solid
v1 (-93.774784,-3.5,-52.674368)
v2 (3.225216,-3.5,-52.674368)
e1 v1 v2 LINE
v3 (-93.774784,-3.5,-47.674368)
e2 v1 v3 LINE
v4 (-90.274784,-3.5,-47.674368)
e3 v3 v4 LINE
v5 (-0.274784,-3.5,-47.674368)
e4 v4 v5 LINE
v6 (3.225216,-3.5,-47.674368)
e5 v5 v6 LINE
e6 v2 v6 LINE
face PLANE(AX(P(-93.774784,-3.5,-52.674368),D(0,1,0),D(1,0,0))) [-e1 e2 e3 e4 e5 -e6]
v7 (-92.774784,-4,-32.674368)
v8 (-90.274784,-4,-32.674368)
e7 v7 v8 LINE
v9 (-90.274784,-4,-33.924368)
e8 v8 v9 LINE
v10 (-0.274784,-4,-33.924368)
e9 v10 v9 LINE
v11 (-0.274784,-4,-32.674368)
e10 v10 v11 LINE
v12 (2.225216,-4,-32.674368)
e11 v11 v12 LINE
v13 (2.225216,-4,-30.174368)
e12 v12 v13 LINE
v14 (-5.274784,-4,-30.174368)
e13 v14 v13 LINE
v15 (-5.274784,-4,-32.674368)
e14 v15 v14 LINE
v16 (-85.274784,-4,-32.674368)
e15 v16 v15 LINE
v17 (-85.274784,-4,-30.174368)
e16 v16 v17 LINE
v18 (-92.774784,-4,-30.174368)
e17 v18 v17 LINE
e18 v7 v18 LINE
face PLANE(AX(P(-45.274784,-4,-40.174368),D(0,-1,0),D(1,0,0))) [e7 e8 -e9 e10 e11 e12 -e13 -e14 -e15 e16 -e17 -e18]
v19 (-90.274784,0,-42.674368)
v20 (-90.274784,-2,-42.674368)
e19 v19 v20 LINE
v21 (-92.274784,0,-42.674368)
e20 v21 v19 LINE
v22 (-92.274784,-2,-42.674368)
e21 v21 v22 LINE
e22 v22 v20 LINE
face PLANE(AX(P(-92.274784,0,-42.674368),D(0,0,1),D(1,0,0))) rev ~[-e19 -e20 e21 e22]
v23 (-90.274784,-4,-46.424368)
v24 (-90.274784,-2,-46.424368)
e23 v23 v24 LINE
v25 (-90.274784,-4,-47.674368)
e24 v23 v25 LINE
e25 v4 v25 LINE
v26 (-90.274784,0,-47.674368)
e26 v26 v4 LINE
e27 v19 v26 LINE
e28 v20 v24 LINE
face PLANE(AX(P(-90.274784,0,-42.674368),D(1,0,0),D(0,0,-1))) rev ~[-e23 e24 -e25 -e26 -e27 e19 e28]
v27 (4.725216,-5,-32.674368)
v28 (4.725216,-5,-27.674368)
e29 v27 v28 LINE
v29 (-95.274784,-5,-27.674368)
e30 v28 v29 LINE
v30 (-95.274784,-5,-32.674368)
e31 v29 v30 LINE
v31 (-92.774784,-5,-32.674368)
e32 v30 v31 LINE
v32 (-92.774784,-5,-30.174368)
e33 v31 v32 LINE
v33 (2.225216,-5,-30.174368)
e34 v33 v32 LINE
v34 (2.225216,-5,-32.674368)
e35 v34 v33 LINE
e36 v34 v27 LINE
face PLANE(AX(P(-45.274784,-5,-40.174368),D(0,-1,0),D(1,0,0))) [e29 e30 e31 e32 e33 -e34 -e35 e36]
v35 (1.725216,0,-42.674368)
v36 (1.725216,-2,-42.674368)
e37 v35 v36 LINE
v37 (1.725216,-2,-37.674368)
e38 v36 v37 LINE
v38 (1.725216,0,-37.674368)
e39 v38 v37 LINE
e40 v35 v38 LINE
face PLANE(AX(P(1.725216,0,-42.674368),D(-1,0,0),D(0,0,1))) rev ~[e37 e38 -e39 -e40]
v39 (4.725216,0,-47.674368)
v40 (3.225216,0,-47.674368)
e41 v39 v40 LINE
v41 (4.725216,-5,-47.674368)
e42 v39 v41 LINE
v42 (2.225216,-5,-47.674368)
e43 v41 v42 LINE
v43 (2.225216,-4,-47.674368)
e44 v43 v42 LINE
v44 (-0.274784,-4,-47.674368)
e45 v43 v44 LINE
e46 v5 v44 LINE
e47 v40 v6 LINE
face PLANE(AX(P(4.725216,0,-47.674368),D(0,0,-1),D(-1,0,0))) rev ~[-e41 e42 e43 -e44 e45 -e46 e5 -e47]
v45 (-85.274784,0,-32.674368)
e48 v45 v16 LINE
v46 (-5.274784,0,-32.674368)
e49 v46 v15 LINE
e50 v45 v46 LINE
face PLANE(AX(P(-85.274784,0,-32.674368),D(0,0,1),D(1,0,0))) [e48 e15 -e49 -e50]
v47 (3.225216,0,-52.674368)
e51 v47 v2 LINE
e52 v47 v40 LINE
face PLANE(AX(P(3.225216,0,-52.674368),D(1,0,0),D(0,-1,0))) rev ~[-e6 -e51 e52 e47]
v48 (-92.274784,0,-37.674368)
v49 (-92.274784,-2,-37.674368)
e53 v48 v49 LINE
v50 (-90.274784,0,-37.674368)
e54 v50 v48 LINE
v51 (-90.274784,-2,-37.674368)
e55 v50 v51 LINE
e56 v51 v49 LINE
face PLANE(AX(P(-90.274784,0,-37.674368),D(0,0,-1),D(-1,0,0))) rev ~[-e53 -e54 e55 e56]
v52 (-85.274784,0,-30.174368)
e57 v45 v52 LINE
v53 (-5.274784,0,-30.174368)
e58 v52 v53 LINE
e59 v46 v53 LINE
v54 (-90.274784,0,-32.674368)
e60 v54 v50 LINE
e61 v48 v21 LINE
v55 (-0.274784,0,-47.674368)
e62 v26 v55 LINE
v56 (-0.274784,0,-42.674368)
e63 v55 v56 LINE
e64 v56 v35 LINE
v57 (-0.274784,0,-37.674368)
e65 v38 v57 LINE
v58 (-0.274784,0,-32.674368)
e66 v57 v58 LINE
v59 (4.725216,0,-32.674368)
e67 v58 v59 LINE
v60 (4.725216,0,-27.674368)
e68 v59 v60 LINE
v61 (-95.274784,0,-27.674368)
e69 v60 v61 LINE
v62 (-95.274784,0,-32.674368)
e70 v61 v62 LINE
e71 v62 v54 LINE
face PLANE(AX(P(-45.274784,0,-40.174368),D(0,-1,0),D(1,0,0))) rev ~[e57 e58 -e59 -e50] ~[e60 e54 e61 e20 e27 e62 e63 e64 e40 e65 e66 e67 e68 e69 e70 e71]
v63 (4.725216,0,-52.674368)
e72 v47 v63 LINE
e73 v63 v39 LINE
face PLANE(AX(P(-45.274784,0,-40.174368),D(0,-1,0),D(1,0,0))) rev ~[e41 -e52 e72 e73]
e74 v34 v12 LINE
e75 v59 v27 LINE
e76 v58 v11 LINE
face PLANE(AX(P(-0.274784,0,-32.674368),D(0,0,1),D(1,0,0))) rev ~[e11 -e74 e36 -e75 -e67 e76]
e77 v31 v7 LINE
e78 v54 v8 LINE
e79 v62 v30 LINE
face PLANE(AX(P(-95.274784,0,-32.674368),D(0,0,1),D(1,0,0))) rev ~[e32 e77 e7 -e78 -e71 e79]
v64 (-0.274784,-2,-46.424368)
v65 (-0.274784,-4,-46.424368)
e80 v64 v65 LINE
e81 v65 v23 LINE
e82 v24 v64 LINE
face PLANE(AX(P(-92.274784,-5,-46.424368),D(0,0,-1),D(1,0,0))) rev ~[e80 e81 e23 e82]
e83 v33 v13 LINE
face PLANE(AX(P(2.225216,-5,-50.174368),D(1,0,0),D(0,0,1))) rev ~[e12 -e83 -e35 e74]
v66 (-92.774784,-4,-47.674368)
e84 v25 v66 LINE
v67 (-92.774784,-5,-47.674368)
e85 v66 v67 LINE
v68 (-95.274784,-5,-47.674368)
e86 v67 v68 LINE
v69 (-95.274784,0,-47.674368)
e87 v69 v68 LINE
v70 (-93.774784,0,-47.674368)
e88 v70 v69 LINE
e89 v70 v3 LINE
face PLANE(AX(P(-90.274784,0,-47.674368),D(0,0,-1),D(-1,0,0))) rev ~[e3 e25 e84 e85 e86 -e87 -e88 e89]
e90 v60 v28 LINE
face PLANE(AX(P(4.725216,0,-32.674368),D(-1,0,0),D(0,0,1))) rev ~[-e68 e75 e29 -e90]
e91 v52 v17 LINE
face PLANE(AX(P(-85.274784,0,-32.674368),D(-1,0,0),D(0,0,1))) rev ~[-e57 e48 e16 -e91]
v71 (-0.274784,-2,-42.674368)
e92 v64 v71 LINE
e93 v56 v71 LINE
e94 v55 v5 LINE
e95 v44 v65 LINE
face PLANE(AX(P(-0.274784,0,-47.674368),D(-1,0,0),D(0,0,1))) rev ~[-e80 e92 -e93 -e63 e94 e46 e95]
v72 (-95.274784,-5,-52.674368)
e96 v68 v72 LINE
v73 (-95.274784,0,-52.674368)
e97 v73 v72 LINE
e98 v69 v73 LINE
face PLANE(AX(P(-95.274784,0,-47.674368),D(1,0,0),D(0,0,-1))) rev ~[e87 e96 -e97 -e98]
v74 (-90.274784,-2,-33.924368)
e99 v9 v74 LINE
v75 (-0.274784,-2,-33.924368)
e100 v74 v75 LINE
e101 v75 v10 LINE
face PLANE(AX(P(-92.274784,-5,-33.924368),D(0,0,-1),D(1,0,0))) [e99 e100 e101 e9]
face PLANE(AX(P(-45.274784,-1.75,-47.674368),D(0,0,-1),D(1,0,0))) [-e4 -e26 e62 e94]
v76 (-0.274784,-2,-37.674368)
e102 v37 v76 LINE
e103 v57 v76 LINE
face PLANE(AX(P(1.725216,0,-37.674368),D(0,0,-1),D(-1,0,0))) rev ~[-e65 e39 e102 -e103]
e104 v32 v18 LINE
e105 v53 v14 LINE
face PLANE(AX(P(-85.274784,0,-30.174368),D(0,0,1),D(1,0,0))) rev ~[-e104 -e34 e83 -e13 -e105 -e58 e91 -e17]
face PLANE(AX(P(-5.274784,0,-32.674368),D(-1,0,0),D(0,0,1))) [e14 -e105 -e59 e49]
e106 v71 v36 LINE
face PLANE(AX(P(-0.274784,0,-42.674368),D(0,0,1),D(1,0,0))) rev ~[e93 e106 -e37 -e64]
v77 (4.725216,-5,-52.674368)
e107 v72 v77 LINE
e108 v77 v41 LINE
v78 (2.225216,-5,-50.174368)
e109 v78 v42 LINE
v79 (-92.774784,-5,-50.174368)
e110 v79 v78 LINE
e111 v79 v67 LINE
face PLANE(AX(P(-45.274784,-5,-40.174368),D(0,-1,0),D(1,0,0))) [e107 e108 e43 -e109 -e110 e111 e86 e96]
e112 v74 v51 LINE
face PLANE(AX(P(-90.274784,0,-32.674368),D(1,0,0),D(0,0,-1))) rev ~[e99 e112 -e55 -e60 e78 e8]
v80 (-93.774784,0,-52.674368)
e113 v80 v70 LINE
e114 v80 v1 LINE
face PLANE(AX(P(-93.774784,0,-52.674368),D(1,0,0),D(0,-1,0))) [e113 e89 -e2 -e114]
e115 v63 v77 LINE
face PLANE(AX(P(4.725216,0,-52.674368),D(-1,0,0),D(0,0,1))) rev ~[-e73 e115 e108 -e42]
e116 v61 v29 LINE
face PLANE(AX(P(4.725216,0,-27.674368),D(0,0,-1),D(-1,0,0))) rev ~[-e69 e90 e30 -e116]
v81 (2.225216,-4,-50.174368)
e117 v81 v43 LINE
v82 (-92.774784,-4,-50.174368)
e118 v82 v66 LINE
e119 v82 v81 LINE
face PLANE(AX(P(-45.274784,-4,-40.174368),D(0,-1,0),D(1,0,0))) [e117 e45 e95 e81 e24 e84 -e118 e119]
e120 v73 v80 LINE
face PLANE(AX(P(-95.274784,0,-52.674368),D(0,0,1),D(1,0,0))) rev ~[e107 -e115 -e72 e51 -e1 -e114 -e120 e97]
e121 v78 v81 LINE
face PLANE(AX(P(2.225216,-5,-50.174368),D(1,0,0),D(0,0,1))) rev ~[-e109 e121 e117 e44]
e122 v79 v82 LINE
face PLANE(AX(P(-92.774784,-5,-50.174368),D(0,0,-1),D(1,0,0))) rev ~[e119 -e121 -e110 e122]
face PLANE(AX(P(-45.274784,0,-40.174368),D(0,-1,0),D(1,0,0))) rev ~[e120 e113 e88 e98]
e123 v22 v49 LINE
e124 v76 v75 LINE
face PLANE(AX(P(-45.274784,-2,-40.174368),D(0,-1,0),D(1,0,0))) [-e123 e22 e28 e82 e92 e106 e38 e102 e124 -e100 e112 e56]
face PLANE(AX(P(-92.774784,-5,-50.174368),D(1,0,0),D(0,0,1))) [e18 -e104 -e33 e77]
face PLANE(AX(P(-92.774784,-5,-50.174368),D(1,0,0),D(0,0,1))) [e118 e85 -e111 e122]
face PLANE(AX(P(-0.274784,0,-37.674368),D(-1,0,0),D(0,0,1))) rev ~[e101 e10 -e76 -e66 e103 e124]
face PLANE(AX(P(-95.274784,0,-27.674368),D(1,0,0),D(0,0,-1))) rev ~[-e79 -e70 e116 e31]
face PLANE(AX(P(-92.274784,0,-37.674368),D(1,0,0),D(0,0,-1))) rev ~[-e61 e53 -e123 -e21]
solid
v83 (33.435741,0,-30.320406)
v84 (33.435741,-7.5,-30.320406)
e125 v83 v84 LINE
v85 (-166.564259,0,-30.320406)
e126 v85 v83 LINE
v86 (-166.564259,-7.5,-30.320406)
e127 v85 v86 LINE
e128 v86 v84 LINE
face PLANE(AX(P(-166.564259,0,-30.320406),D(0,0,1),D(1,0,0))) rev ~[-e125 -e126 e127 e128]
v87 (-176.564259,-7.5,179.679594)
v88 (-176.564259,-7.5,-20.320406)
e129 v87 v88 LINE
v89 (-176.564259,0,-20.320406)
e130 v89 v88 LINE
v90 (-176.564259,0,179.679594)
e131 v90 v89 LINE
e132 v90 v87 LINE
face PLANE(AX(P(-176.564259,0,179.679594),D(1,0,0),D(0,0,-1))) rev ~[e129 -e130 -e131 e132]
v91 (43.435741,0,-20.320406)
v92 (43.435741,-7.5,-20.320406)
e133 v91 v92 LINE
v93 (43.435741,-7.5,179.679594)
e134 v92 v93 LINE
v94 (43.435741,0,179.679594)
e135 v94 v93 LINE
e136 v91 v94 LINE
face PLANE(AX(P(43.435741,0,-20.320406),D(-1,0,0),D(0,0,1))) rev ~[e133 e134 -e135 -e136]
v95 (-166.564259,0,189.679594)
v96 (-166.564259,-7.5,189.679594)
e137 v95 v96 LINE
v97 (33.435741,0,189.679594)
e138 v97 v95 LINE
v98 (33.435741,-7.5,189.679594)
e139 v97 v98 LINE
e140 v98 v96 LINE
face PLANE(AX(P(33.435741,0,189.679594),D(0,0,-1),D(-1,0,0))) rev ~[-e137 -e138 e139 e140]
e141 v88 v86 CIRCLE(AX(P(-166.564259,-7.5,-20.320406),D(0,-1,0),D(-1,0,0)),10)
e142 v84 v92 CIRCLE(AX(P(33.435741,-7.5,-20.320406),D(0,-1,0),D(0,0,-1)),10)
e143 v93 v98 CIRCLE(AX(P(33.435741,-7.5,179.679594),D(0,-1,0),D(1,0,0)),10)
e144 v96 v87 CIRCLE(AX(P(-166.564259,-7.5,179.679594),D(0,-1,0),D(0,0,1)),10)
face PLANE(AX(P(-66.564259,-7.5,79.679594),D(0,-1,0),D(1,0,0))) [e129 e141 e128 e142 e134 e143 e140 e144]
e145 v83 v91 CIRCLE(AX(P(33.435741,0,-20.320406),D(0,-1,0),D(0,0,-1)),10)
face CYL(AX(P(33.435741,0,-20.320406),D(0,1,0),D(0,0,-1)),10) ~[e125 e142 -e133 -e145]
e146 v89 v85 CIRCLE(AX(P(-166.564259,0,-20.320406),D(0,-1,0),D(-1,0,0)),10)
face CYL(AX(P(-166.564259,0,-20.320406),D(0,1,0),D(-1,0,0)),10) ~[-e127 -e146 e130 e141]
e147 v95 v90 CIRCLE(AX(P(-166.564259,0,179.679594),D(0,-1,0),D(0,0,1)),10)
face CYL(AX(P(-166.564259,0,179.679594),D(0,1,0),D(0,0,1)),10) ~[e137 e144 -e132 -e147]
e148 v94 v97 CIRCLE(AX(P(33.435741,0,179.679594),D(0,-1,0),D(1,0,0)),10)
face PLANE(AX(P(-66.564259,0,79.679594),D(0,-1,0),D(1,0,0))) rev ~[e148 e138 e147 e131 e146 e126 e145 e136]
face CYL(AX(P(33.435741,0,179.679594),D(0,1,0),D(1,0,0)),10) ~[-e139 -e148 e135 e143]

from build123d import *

# Parameters (mm, degrees)
F0_R     = 5
F1_DEPTH = 7.5
F2_W     = 80
F2_H     = 2.5
F3_DEPTH = 5
F4_W     = 94
F4_H     = 12.5
F5_DEPTH = 3
F6_W     = 97
F6_H     = 3.5
F7_DEPTH = 5
F8_W     = 95
F8_H     = 20
F9_DEPTH = 1


with BuildPart() as f1:
    # F0 (on Front) → F1 (new body)
    with BuildSketch(Plane.XZ):
        with BuildLine():
            Line((33.4357412159, 189.6795940399), (-166.5642587841, 189.6795940399))
            ThreePointArc((-166.5642587841, 189.6795940399), (-173.6353265959, 186.7506618518), (-176.5642587841, 179.6795940399))
            Line((-176.5642587841, 179.6795940399), (-176.5642587841, -20.3204059601))
            ThreePointArc((-176.5642587841, -20.3204059601), (-173.6353265959, -27.3914737719), (-166.5642587841, -30.3204059601))
            Line((-166.5642587841, -30.3204059601), (33.4357412159, -30.3204059601))
            ThreePointArc((33.4357412159, -30.3204059601), (40.5068090278, -27.3914737719), (43.4357412159, -20.3204059601))
            Line((43.4357412159, -20.3204059601), (43.4357412159, 179.6795940399))
            ThreePointArc((43.4357412159, 179.6795940399), (40.5068090278, 186.7506618518), (33.4357412159, 189.6795940399))
        make_face()
        with Locations((-116.5642587841, 29.6795940399)):
            Circle(F0_R, mode=Mode.SUBTRACT)
        with Locations((-16.5642587841, 29.6795940399)):
            Circle(F0_R, mode=Mode.SUBTRACT)
        with Locations((-116.5642587841, 129.6795940399)):
            Circle(F0_R, mode=Mode.SUBTRACT)
        with Locations((-16.5642587841, 129.6795940399)):
            Circle(F0_R, mode=Mode.SUBTRACT)
        with Locations((-116.5642587841, 129.6795940399)):
            Circle(F0_R)
        with Locations((-16.5642587841, 129.6795940399)):
            Circle(F0_R)
        with Locations((-16.5642587841, 29.6795940399)):
            Circle(F0_R)
        with Locations((-116.5642587841, 29.6795940399)):
            Circle(F0_R)
    extrude(amount=F1_DEPTH)


with BuildPart() as f3:
    # F2 (on Front) → F3 (new body)
    with BuildSketch(Plane.XZ):
        Polygon((-95.2747841366, -52.6743675989), (-90.2747841366, -52.6743675989), (4.7252158634, -52.6743675989), (4.7252158634, -47.6743675989), (-0.2747841366, -47.6743675989), (-0.2747841366, -42.6743675989), (1.7252158634, -42.6743675989), (1.7252158634, -37.6743675989), (-0.2747841366, -37.6743675989), (-0.2747841366, -32.6743675989), (4.7252158634, -32.6743675989), (4.7252158634, -27.6743675989), (-90.2747841366, -27.6743675989), (-95.2747841366, -27.6743675989), (-95.2747841366, -32.6743675989), (-90.2747841366, -32.6743675989), (-90.2747841366, -37.6743675989), (-92.2747841366, -37.6743675989), (-92.2747841366, -42.6743675989), (-90.2747841366, -42.6743675989), (-90.2747841366, -47.6743675989), (-95.2747841366, -47.6743675989), align=None)
        with Locations((-45.2747841366, -31.4243675989)):
            Rectangle(F2_W, F2_H, mode=Mode.SUBTRACT)
    extrude(amount=F3_DEPTH)

    # F4 (on face) → F5 (cut)
    with BuildSketch(Plane.XZ.offset(5)):
        with Locations((-45.2747841366, -40.1743675989)):
            Rectangle(F4_W, F4_H)
    extrude(amount=-F5_DEPTH, mode=Mode.SUBTRACT)

    # F6 (on face) → F7 (cut)
    with BuildSketch(Plane(origin=(0, 0, -52.6743675989), x_dir=(1, 0, 0), z_dir=(0, 0, -1))):
        with Locations((-45.2747841366, 1.75)):
            Rectangle(F6_W, F6_H)
    extrude(amount=-F7_DEPTH, mode=Mode.SUBTRACT)

    # F8 (on face) → F9 (cut)
    with BuildSketch(Plane.XZ.offset(5)):
        with Locations((-45.2747841366, -40.1743675989)):
            Rectangle(F8_W, F8_H)
    extrude(amount=-F9_DEPTH, mode=Mode.SUBTRACT)


solid = Compound([f1.part, f3.part])
